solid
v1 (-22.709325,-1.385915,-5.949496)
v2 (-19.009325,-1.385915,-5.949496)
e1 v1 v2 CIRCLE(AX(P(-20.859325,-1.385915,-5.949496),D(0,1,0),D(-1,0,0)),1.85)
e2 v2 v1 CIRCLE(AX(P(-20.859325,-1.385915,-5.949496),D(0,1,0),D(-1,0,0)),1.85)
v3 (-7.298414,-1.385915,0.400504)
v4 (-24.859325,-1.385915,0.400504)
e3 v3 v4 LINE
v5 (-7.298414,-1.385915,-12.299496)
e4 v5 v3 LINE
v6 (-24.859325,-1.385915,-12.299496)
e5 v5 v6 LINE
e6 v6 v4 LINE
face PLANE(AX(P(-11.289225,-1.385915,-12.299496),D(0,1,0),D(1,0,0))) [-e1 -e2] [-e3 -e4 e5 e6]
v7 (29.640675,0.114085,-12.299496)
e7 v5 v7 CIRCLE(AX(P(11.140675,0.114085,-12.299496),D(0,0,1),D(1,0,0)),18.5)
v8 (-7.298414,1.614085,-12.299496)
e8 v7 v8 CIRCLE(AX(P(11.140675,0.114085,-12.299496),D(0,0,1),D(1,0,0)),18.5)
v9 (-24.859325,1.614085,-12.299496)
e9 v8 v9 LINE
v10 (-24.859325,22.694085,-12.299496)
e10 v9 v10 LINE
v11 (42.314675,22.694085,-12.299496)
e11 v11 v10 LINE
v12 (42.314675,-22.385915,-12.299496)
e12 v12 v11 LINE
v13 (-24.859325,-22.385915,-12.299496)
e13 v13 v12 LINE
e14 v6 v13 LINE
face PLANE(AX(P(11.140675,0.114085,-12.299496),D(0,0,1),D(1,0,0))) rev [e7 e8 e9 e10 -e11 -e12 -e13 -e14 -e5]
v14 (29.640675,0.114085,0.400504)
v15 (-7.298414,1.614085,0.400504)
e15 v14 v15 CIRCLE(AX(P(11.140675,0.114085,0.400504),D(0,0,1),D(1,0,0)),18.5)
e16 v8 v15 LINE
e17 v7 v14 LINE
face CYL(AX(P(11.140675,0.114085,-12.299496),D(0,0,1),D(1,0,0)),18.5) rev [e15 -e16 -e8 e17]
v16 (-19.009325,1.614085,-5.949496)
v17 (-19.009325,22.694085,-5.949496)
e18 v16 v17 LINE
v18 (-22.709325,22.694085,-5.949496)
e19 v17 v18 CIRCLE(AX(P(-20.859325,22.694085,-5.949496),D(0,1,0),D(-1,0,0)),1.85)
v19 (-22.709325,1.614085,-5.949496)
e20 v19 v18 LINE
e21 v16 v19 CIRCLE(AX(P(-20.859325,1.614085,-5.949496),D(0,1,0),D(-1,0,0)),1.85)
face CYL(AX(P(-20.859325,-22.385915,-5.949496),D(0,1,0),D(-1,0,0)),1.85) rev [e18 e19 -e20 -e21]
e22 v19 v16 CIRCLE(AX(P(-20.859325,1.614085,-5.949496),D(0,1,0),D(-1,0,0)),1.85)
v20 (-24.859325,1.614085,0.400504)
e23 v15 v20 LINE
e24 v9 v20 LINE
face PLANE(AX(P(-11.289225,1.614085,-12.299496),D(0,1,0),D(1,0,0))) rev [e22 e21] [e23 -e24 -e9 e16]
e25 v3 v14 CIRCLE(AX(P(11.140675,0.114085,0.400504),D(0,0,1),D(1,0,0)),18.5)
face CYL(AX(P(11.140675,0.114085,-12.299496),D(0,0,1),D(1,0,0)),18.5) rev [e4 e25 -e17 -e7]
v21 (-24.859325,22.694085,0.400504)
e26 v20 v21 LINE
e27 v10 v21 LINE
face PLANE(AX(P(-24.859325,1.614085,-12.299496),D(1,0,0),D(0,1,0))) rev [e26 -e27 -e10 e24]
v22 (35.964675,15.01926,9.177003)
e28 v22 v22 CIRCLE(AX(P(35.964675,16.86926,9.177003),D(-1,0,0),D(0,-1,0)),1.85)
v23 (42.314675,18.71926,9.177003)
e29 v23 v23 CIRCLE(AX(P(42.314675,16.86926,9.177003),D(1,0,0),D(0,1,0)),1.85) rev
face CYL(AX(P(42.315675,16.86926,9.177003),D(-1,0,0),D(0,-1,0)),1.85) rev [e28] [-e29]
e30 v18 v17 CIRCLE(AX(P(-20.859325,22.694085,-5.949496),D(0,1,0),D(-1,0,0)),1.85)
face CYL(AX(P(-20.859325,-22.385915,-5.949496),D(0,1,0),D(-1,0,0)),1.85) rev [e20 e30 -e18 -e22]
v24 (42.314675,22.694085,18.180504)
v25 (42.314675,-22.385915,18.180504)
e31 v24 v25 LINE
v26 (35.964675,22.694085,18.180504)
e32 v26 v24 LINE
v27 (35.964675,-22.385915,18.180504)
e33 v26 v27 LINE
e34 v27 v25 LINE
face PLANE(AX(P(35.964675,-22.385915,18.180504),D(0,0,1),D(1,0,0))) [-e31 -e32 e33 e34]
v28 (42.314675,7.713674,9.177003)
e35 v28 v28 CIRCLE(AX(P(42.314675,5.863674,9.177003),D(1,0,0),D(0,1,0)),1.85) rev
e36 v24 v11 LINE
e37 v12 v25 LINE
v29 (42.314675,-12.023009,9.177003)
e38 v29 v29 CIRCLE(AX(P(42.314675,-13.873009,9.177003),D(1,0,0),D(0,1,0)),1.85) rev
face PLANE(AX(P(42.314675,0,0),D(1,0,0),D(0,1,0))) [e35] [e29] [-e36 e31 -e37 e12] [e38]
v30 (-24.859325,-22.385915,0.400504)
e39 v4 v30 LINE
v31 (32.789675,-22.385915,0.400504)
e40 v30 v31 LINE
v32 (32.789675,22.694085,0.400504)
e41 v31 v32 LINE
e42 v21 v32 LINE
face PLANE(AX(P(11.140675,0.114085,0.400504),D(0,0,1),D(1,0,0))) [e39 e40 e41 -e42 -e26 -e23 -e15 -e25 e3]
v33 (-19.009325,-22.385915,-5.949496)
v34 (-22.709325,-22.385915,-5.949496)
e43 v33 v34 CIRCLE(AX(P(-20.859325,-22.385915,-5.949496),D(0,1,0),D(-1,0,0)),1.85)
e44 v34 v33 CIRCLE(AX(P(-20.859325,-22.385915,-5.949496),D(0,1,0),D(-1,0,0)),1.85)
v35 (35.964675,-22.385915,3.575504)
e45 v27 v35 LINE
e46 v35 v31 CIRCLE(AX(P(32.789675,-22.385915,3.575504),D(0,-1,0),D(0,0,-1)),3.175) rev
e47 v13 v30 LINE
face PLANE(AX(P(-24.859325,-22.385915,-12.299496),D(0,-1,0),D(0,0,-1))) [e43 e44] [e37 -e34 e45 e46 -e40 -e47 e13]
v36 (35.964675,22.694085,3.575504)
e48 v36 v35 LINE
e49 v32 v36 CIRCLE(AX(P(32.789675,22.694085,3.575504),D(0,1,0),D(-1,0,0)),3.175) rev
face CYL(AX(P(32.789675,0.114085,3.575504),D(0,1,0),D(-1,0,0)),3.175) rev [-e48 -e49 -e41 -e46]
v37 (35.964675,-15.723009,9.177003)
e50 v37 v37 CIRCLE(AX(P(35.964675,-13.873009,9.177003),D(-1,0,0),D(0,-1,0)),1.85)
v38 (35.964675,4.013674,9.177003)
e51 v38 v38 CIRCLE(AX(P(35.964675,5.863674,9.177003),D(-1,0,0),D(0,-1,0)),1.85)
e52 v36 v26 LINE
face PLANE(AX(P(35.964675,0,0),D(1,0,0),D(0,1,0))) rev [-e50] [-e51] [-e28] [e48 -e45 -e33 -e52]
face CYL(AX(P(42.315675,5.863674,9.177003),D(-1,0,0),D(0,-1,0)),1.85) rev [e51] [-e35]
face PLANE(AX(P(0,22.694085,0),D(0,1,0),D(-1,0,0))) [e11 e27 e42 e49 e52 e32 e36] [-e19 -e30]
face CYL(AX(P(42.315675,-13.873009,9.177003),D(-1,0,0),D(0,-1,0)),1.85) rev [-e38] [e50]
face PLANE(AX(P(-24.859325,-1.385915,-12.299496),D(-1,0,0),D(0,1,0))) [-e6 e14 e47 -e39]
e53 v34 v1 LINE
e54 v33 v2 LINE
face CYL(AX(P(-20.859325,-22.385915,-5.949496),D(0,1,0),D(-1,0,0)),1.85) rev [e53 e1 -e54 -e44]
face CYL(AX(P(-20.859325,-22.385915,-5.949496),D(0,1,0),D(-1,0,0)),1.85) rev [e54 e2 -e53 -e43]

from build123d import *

# Parameters (mm, degrees)
CUT_EXTRUDE1_START       = -22.385915399
CUT_EXTRUDE1_OUTLINE_R   = 1.85
CUT_EXTRUDE1_DEPTH       = 4
CUT_EXTRUDE1_START_2     = -18.385915399
CUT_EXTRUDE1_2_OUTLINE_R = 1.85
CUT_EXTRUDE1_2_DEPTH     = 40.98
CUT_EXTRUDE1_START_3     = -12.299495873
CUT_EXTRUDE1_3_DEPTH     = 12.7
SKETCH2_W                = 30.48
SKETCH2_H                = 44.98
BOSS_EXTRUDE1_DEPTH      = 6.35
CUT_EXTRUDE2_REACH       = 69.384
SKETCH3_R                = 1.85
BOSS_EXTRUDE3_REACH      = 66.446
SKETCH4_W                = 67.174
SKETCH4_H                = 12.7
SKETCH5_W                = 6.35
SKETCH5_H                = 17.78
BOSS_EXTRUDE4_DEPTH      = 0.1
FILLET1_R                = 3.175


with BuildPart() as part:
    # Cut-Extrude1: read off the stored shape, not the designer's step
    # Cut-Extrude1 outline → Cut-Extrude1 (new body)
    with BuildSketch(Plane(origin=(0, 0, 0), x_dir=(1, 0, 0), z_dir=(0, 1, 0)).offset(CUT_EXTRUDE1_START)):
        with BuildLine():
            ThreePointArc((41.290674946, 5.949495873), (41.56736633, 6.922737878), (42.314674946, 7.604858069))
            Line((42.314674946, 7.604858069), (42.314674946, 12.299495873))
            Line((42.314674946, 12.299495873), (-24.859325054, 12.299495873))
            Line((-24.859325054, 12.299495873), (-24.859325054, -0.400504127))
            Line((-24.859325054, -0.400504127), (42.314674946, -0.400504127))
            Line((42.314674946, -0.400504127), (42.314674946, 4.294133677))
            ThreePointArc((42.314674946, 4.294133677), (41.56736633, 4.976253868), (41.290674946, 5.949495873))
        make_face()
        with Locations((-20.859325054, 5.949495873)):
            Circle(CUT_EXTRUDE1_OUTLINE_R, mode=Mode.SUBTRACT)
    extrude(amount=CUT_EXTRUDE1_DEPTH)

    # Cut-Extrude1 2 outline → Cut-Extrude1 2 (add)
    with BuildSketch(Plane(origin=(0, 0, 0), x_dir=(1, 0, 0), z_dir=(0, 1, 0)).offset(CUT_EXTRUDE1_START_2)):
        with BuildLine():
            ThreePointArc((41.290674946, 5.949495873), (41.56736633, 6.922737878), (42.314674946, 7.604858069))
            Line((42.314674946, 7.604858069), (42.314674946, 12.299495873))
            Line((42.314674946, 12.299495873), (-24.859325054, 12.299495873))
            Line((-24.859325054, 12.299495873), (-24.859325054, -0.400504127))
            Line((-24.859325054, -0.400504127), (42.314674946, -0.400504127))
            Line((42.314674946, -0.400504127), (42.314674946, 4.294133677))
            ThreePointArc((42.314674946, 4.294133677), (41.56736633, 4.976253868), (41.290674946, 5.949495873))
        make_face()
        with Locations((-20.859325054, 5.949495873)):
            Circle(CUT_EXTRUDE1_2_OUTLINE_R, mode=Mode.SUBTRACT)
    extrude(amount=CUT_EXTRUDE1_2_DEPTH)

    # Cut-Extrude1 3 outline → Cut-Extrude1 3 (cut)
    with BuildSketch(Plane.XY.offset(CUT_EXTRUDE1_START_3)):
        with BuildLine():
            Line((-7.298413969, 1.614084601), (-24.859325054, 1.614084601))
            Line((-24.859325054, 1.614084601), (-24.859325054, -1.385915399))
            Line((-24.859325054, -1.385915399), (-7.298413969, -1.385915399))
            ThreePointArc((-7.298413969, -1.385915399), (11.891293051, -18.370681356), (29.640674946, 0.114084601))
            ThreePointArc((29.640674946, 0.114084601), (11.891293051, 18.598850557), (-7.298413969, 1.614084601))
        make_face()
        with BuildLine():
            ThreePointArc((-8.270513308, 11.452345957), (-0.050086584, 19.610680621), (11.140674816, 22.594084601))
            Line((11.140674816, 22.594084601), (-24.859325054, 22.594084601))
            Line((-24.859325054, 22.594084601), (-24.859325054, 6.805102167))
            ThreePointArc((-24.859325054, 6.805102167), (-24.419985226, 7.865762339), (-23.359325054, 8.305102167))
            Line((-23.359325054, 8.305102167), (-13.753655898, 8.305102167))
            ThreePointArc((-13.753655898, 8.305102167), (-10.592564467, 9.147834154), (-8.270513308, 11.452345957))
        make_face()
        with BuildLine():
            Line((39.26266634, 0.114084601), (42.314674946, 0.114084601))
            Line((42.314674946, 0.114084601), (42.314674946, 22.594084601))
            Line((42.314674946, 22.594084601), (11.140674816, 22.594084601))
            ThreePointArc((11.140674816, 22.594084601), (25.177120317, 17.67337278), (33.068609963, 5.065454701))
            ThreePointArc((33.068609963, 5.065454701), (35.297745147, 1.504054366), (39.26266634, 0.114084601))
        make_face()
    extrude(amount=CUT_EXTRUDE1_3_DEPTH, mode=Mode.SUBTRACT)

    # Sketch2 → Boss-Extrude1 (add)
    with BuildSketch(Plane(origin=(42.314674946, 0, 0), x_dir=(0, 0, -1), z_dir=(1, 0, 0))):
        with Locations((-2.940504127, 0.104084601)):
            Rectangle(SKETCH2_W, SKETCH2_H)
    extrude(amount=-BOSS_EXTRUDE1_DEPTH)

    # Sketch3 → Cut-Extrude2 (cut, up to next)
    with BuildSketch(Plane.ZY.offset(-35.964674946), mode=Mode.PRIVATE) as cut_extrude2_sk1:
        with Locations(Location((9.177002591, 16.869259883, 0), (0, 0, 270))):
            Circle(SKETCH3_R)
    cut_extrude2_tool1 = extrude(cut_extrude2_sk1.sketch, amount=-CUT_EXTRUDE2_REACH, mode=Mode.PRIVATE) & part.part
    # Sketch3 → Cut-Extrude2 (cut, up to next)
    with BuildSketch(Plane.ZY.offset(-35.964674946), mode=Mode.PRIVATE) as cut_extrude2_sk2:
        with Locations(Location((9.177002591, 5.863674358, 0), (0, 0, 270))):
            Circle(SKETCH3_R)
    cut_extrude2_tool2 = extrude(cut_extrude2_sk2.sketch, amount=-CUT_EXTRUDE2_REACH, mode=Mode.PRIVATE) & part.part
    # Sketch3 → Cut-Extrude2 (cut, up to next)
    with BuildSketch(Plane.ZY.offset(-35.964674946), mode=Mode.PRIVATE) as cut_extrude2_sk3:
        with Locations(Location((9.177002591, -13.873009015, 0), (0, 0, 270))):
            Circle(SKETCH3_R)
    cut_extrude2_tool3 = extrude(cut_extrude2_sk3.sketch, amount=-CUT_EXTRUDE2_REACH, mode=Mode.PRIVATE) & part.part
    add(cut_extrude2_tool1.solids().sort_by_distance((35.964675, 16.86926, 9.177003))[0], mode=Mode.SUBTRACT)
    add(cut_extrude2_tool2.solids().sort_by_distance((35.964675, 5.863674, 9.177003))[0], mode=Mode.SUBTRACT)
    add(cut_extrude2_tool3.solids().sort_by_distance((35.964675, -13.873009, 9.177003))[0], mode=Mode.SUBTRACT)

    # Sketch4 → Boss-Extrude3 (add, up to next)
    with BuildSketch(Plane(origin=(0, 22.694084601, 0), x_dir=(1, 0, 0), z_dir=(0, 1, 0)), mode=Mode.PRIVATE) as boss_extrude3_sk1:
        with Locations((8.727674946, 5.949495873)):
            Rectangle(SKETCH4_W, SKETCH4_H)
        with BuildLine():
            ThreePointArc((-19.009325054, 5.949495873), (-20.859325054, 7.799495873), (-22.709325054, 5.949495873))
            ThreePointArc((-22.709325054, 5.949495873), (-20.859325054, 4.099495873), (-19.009325054, 5.949495873))
        make_face(mode=Mode.SUBTRACT)
    boss_extrude3_tool1 = extrude(boss_extrude3_sk1.sketch, amount=-BOSS_EXTRUDE3_REACH, mode=Mode.PRIVATE) - part.part
    add(boss_extrude3_tool1.solids().sort_by_distance((9.105332, 22.694085, -5.949496))[0])

    # Sketch5 → Boss-Extrude4 (add)
    with BuildSketch(Plane(origin=(0, 22.594084601, 0), x_dir=(1, 0, 0), z_dir=(0, 1, 0))):
        with Locations((39.139674946, -9.290504127)):
            Rectangle(SKETCH5_W, SKETCH5_H)
    extrude(amount=BOSS_EXTRUDE4_DEPTH)

    # Fillet1
    fillet1_edges = [part.edges().sort_by_distance(p)[0] for p in [
        (35.964674946, -10.674112441, 0.400504127),
    ]]
    fillet(fillet1_edges, radius=FILLET1_R)


solid = part.part
